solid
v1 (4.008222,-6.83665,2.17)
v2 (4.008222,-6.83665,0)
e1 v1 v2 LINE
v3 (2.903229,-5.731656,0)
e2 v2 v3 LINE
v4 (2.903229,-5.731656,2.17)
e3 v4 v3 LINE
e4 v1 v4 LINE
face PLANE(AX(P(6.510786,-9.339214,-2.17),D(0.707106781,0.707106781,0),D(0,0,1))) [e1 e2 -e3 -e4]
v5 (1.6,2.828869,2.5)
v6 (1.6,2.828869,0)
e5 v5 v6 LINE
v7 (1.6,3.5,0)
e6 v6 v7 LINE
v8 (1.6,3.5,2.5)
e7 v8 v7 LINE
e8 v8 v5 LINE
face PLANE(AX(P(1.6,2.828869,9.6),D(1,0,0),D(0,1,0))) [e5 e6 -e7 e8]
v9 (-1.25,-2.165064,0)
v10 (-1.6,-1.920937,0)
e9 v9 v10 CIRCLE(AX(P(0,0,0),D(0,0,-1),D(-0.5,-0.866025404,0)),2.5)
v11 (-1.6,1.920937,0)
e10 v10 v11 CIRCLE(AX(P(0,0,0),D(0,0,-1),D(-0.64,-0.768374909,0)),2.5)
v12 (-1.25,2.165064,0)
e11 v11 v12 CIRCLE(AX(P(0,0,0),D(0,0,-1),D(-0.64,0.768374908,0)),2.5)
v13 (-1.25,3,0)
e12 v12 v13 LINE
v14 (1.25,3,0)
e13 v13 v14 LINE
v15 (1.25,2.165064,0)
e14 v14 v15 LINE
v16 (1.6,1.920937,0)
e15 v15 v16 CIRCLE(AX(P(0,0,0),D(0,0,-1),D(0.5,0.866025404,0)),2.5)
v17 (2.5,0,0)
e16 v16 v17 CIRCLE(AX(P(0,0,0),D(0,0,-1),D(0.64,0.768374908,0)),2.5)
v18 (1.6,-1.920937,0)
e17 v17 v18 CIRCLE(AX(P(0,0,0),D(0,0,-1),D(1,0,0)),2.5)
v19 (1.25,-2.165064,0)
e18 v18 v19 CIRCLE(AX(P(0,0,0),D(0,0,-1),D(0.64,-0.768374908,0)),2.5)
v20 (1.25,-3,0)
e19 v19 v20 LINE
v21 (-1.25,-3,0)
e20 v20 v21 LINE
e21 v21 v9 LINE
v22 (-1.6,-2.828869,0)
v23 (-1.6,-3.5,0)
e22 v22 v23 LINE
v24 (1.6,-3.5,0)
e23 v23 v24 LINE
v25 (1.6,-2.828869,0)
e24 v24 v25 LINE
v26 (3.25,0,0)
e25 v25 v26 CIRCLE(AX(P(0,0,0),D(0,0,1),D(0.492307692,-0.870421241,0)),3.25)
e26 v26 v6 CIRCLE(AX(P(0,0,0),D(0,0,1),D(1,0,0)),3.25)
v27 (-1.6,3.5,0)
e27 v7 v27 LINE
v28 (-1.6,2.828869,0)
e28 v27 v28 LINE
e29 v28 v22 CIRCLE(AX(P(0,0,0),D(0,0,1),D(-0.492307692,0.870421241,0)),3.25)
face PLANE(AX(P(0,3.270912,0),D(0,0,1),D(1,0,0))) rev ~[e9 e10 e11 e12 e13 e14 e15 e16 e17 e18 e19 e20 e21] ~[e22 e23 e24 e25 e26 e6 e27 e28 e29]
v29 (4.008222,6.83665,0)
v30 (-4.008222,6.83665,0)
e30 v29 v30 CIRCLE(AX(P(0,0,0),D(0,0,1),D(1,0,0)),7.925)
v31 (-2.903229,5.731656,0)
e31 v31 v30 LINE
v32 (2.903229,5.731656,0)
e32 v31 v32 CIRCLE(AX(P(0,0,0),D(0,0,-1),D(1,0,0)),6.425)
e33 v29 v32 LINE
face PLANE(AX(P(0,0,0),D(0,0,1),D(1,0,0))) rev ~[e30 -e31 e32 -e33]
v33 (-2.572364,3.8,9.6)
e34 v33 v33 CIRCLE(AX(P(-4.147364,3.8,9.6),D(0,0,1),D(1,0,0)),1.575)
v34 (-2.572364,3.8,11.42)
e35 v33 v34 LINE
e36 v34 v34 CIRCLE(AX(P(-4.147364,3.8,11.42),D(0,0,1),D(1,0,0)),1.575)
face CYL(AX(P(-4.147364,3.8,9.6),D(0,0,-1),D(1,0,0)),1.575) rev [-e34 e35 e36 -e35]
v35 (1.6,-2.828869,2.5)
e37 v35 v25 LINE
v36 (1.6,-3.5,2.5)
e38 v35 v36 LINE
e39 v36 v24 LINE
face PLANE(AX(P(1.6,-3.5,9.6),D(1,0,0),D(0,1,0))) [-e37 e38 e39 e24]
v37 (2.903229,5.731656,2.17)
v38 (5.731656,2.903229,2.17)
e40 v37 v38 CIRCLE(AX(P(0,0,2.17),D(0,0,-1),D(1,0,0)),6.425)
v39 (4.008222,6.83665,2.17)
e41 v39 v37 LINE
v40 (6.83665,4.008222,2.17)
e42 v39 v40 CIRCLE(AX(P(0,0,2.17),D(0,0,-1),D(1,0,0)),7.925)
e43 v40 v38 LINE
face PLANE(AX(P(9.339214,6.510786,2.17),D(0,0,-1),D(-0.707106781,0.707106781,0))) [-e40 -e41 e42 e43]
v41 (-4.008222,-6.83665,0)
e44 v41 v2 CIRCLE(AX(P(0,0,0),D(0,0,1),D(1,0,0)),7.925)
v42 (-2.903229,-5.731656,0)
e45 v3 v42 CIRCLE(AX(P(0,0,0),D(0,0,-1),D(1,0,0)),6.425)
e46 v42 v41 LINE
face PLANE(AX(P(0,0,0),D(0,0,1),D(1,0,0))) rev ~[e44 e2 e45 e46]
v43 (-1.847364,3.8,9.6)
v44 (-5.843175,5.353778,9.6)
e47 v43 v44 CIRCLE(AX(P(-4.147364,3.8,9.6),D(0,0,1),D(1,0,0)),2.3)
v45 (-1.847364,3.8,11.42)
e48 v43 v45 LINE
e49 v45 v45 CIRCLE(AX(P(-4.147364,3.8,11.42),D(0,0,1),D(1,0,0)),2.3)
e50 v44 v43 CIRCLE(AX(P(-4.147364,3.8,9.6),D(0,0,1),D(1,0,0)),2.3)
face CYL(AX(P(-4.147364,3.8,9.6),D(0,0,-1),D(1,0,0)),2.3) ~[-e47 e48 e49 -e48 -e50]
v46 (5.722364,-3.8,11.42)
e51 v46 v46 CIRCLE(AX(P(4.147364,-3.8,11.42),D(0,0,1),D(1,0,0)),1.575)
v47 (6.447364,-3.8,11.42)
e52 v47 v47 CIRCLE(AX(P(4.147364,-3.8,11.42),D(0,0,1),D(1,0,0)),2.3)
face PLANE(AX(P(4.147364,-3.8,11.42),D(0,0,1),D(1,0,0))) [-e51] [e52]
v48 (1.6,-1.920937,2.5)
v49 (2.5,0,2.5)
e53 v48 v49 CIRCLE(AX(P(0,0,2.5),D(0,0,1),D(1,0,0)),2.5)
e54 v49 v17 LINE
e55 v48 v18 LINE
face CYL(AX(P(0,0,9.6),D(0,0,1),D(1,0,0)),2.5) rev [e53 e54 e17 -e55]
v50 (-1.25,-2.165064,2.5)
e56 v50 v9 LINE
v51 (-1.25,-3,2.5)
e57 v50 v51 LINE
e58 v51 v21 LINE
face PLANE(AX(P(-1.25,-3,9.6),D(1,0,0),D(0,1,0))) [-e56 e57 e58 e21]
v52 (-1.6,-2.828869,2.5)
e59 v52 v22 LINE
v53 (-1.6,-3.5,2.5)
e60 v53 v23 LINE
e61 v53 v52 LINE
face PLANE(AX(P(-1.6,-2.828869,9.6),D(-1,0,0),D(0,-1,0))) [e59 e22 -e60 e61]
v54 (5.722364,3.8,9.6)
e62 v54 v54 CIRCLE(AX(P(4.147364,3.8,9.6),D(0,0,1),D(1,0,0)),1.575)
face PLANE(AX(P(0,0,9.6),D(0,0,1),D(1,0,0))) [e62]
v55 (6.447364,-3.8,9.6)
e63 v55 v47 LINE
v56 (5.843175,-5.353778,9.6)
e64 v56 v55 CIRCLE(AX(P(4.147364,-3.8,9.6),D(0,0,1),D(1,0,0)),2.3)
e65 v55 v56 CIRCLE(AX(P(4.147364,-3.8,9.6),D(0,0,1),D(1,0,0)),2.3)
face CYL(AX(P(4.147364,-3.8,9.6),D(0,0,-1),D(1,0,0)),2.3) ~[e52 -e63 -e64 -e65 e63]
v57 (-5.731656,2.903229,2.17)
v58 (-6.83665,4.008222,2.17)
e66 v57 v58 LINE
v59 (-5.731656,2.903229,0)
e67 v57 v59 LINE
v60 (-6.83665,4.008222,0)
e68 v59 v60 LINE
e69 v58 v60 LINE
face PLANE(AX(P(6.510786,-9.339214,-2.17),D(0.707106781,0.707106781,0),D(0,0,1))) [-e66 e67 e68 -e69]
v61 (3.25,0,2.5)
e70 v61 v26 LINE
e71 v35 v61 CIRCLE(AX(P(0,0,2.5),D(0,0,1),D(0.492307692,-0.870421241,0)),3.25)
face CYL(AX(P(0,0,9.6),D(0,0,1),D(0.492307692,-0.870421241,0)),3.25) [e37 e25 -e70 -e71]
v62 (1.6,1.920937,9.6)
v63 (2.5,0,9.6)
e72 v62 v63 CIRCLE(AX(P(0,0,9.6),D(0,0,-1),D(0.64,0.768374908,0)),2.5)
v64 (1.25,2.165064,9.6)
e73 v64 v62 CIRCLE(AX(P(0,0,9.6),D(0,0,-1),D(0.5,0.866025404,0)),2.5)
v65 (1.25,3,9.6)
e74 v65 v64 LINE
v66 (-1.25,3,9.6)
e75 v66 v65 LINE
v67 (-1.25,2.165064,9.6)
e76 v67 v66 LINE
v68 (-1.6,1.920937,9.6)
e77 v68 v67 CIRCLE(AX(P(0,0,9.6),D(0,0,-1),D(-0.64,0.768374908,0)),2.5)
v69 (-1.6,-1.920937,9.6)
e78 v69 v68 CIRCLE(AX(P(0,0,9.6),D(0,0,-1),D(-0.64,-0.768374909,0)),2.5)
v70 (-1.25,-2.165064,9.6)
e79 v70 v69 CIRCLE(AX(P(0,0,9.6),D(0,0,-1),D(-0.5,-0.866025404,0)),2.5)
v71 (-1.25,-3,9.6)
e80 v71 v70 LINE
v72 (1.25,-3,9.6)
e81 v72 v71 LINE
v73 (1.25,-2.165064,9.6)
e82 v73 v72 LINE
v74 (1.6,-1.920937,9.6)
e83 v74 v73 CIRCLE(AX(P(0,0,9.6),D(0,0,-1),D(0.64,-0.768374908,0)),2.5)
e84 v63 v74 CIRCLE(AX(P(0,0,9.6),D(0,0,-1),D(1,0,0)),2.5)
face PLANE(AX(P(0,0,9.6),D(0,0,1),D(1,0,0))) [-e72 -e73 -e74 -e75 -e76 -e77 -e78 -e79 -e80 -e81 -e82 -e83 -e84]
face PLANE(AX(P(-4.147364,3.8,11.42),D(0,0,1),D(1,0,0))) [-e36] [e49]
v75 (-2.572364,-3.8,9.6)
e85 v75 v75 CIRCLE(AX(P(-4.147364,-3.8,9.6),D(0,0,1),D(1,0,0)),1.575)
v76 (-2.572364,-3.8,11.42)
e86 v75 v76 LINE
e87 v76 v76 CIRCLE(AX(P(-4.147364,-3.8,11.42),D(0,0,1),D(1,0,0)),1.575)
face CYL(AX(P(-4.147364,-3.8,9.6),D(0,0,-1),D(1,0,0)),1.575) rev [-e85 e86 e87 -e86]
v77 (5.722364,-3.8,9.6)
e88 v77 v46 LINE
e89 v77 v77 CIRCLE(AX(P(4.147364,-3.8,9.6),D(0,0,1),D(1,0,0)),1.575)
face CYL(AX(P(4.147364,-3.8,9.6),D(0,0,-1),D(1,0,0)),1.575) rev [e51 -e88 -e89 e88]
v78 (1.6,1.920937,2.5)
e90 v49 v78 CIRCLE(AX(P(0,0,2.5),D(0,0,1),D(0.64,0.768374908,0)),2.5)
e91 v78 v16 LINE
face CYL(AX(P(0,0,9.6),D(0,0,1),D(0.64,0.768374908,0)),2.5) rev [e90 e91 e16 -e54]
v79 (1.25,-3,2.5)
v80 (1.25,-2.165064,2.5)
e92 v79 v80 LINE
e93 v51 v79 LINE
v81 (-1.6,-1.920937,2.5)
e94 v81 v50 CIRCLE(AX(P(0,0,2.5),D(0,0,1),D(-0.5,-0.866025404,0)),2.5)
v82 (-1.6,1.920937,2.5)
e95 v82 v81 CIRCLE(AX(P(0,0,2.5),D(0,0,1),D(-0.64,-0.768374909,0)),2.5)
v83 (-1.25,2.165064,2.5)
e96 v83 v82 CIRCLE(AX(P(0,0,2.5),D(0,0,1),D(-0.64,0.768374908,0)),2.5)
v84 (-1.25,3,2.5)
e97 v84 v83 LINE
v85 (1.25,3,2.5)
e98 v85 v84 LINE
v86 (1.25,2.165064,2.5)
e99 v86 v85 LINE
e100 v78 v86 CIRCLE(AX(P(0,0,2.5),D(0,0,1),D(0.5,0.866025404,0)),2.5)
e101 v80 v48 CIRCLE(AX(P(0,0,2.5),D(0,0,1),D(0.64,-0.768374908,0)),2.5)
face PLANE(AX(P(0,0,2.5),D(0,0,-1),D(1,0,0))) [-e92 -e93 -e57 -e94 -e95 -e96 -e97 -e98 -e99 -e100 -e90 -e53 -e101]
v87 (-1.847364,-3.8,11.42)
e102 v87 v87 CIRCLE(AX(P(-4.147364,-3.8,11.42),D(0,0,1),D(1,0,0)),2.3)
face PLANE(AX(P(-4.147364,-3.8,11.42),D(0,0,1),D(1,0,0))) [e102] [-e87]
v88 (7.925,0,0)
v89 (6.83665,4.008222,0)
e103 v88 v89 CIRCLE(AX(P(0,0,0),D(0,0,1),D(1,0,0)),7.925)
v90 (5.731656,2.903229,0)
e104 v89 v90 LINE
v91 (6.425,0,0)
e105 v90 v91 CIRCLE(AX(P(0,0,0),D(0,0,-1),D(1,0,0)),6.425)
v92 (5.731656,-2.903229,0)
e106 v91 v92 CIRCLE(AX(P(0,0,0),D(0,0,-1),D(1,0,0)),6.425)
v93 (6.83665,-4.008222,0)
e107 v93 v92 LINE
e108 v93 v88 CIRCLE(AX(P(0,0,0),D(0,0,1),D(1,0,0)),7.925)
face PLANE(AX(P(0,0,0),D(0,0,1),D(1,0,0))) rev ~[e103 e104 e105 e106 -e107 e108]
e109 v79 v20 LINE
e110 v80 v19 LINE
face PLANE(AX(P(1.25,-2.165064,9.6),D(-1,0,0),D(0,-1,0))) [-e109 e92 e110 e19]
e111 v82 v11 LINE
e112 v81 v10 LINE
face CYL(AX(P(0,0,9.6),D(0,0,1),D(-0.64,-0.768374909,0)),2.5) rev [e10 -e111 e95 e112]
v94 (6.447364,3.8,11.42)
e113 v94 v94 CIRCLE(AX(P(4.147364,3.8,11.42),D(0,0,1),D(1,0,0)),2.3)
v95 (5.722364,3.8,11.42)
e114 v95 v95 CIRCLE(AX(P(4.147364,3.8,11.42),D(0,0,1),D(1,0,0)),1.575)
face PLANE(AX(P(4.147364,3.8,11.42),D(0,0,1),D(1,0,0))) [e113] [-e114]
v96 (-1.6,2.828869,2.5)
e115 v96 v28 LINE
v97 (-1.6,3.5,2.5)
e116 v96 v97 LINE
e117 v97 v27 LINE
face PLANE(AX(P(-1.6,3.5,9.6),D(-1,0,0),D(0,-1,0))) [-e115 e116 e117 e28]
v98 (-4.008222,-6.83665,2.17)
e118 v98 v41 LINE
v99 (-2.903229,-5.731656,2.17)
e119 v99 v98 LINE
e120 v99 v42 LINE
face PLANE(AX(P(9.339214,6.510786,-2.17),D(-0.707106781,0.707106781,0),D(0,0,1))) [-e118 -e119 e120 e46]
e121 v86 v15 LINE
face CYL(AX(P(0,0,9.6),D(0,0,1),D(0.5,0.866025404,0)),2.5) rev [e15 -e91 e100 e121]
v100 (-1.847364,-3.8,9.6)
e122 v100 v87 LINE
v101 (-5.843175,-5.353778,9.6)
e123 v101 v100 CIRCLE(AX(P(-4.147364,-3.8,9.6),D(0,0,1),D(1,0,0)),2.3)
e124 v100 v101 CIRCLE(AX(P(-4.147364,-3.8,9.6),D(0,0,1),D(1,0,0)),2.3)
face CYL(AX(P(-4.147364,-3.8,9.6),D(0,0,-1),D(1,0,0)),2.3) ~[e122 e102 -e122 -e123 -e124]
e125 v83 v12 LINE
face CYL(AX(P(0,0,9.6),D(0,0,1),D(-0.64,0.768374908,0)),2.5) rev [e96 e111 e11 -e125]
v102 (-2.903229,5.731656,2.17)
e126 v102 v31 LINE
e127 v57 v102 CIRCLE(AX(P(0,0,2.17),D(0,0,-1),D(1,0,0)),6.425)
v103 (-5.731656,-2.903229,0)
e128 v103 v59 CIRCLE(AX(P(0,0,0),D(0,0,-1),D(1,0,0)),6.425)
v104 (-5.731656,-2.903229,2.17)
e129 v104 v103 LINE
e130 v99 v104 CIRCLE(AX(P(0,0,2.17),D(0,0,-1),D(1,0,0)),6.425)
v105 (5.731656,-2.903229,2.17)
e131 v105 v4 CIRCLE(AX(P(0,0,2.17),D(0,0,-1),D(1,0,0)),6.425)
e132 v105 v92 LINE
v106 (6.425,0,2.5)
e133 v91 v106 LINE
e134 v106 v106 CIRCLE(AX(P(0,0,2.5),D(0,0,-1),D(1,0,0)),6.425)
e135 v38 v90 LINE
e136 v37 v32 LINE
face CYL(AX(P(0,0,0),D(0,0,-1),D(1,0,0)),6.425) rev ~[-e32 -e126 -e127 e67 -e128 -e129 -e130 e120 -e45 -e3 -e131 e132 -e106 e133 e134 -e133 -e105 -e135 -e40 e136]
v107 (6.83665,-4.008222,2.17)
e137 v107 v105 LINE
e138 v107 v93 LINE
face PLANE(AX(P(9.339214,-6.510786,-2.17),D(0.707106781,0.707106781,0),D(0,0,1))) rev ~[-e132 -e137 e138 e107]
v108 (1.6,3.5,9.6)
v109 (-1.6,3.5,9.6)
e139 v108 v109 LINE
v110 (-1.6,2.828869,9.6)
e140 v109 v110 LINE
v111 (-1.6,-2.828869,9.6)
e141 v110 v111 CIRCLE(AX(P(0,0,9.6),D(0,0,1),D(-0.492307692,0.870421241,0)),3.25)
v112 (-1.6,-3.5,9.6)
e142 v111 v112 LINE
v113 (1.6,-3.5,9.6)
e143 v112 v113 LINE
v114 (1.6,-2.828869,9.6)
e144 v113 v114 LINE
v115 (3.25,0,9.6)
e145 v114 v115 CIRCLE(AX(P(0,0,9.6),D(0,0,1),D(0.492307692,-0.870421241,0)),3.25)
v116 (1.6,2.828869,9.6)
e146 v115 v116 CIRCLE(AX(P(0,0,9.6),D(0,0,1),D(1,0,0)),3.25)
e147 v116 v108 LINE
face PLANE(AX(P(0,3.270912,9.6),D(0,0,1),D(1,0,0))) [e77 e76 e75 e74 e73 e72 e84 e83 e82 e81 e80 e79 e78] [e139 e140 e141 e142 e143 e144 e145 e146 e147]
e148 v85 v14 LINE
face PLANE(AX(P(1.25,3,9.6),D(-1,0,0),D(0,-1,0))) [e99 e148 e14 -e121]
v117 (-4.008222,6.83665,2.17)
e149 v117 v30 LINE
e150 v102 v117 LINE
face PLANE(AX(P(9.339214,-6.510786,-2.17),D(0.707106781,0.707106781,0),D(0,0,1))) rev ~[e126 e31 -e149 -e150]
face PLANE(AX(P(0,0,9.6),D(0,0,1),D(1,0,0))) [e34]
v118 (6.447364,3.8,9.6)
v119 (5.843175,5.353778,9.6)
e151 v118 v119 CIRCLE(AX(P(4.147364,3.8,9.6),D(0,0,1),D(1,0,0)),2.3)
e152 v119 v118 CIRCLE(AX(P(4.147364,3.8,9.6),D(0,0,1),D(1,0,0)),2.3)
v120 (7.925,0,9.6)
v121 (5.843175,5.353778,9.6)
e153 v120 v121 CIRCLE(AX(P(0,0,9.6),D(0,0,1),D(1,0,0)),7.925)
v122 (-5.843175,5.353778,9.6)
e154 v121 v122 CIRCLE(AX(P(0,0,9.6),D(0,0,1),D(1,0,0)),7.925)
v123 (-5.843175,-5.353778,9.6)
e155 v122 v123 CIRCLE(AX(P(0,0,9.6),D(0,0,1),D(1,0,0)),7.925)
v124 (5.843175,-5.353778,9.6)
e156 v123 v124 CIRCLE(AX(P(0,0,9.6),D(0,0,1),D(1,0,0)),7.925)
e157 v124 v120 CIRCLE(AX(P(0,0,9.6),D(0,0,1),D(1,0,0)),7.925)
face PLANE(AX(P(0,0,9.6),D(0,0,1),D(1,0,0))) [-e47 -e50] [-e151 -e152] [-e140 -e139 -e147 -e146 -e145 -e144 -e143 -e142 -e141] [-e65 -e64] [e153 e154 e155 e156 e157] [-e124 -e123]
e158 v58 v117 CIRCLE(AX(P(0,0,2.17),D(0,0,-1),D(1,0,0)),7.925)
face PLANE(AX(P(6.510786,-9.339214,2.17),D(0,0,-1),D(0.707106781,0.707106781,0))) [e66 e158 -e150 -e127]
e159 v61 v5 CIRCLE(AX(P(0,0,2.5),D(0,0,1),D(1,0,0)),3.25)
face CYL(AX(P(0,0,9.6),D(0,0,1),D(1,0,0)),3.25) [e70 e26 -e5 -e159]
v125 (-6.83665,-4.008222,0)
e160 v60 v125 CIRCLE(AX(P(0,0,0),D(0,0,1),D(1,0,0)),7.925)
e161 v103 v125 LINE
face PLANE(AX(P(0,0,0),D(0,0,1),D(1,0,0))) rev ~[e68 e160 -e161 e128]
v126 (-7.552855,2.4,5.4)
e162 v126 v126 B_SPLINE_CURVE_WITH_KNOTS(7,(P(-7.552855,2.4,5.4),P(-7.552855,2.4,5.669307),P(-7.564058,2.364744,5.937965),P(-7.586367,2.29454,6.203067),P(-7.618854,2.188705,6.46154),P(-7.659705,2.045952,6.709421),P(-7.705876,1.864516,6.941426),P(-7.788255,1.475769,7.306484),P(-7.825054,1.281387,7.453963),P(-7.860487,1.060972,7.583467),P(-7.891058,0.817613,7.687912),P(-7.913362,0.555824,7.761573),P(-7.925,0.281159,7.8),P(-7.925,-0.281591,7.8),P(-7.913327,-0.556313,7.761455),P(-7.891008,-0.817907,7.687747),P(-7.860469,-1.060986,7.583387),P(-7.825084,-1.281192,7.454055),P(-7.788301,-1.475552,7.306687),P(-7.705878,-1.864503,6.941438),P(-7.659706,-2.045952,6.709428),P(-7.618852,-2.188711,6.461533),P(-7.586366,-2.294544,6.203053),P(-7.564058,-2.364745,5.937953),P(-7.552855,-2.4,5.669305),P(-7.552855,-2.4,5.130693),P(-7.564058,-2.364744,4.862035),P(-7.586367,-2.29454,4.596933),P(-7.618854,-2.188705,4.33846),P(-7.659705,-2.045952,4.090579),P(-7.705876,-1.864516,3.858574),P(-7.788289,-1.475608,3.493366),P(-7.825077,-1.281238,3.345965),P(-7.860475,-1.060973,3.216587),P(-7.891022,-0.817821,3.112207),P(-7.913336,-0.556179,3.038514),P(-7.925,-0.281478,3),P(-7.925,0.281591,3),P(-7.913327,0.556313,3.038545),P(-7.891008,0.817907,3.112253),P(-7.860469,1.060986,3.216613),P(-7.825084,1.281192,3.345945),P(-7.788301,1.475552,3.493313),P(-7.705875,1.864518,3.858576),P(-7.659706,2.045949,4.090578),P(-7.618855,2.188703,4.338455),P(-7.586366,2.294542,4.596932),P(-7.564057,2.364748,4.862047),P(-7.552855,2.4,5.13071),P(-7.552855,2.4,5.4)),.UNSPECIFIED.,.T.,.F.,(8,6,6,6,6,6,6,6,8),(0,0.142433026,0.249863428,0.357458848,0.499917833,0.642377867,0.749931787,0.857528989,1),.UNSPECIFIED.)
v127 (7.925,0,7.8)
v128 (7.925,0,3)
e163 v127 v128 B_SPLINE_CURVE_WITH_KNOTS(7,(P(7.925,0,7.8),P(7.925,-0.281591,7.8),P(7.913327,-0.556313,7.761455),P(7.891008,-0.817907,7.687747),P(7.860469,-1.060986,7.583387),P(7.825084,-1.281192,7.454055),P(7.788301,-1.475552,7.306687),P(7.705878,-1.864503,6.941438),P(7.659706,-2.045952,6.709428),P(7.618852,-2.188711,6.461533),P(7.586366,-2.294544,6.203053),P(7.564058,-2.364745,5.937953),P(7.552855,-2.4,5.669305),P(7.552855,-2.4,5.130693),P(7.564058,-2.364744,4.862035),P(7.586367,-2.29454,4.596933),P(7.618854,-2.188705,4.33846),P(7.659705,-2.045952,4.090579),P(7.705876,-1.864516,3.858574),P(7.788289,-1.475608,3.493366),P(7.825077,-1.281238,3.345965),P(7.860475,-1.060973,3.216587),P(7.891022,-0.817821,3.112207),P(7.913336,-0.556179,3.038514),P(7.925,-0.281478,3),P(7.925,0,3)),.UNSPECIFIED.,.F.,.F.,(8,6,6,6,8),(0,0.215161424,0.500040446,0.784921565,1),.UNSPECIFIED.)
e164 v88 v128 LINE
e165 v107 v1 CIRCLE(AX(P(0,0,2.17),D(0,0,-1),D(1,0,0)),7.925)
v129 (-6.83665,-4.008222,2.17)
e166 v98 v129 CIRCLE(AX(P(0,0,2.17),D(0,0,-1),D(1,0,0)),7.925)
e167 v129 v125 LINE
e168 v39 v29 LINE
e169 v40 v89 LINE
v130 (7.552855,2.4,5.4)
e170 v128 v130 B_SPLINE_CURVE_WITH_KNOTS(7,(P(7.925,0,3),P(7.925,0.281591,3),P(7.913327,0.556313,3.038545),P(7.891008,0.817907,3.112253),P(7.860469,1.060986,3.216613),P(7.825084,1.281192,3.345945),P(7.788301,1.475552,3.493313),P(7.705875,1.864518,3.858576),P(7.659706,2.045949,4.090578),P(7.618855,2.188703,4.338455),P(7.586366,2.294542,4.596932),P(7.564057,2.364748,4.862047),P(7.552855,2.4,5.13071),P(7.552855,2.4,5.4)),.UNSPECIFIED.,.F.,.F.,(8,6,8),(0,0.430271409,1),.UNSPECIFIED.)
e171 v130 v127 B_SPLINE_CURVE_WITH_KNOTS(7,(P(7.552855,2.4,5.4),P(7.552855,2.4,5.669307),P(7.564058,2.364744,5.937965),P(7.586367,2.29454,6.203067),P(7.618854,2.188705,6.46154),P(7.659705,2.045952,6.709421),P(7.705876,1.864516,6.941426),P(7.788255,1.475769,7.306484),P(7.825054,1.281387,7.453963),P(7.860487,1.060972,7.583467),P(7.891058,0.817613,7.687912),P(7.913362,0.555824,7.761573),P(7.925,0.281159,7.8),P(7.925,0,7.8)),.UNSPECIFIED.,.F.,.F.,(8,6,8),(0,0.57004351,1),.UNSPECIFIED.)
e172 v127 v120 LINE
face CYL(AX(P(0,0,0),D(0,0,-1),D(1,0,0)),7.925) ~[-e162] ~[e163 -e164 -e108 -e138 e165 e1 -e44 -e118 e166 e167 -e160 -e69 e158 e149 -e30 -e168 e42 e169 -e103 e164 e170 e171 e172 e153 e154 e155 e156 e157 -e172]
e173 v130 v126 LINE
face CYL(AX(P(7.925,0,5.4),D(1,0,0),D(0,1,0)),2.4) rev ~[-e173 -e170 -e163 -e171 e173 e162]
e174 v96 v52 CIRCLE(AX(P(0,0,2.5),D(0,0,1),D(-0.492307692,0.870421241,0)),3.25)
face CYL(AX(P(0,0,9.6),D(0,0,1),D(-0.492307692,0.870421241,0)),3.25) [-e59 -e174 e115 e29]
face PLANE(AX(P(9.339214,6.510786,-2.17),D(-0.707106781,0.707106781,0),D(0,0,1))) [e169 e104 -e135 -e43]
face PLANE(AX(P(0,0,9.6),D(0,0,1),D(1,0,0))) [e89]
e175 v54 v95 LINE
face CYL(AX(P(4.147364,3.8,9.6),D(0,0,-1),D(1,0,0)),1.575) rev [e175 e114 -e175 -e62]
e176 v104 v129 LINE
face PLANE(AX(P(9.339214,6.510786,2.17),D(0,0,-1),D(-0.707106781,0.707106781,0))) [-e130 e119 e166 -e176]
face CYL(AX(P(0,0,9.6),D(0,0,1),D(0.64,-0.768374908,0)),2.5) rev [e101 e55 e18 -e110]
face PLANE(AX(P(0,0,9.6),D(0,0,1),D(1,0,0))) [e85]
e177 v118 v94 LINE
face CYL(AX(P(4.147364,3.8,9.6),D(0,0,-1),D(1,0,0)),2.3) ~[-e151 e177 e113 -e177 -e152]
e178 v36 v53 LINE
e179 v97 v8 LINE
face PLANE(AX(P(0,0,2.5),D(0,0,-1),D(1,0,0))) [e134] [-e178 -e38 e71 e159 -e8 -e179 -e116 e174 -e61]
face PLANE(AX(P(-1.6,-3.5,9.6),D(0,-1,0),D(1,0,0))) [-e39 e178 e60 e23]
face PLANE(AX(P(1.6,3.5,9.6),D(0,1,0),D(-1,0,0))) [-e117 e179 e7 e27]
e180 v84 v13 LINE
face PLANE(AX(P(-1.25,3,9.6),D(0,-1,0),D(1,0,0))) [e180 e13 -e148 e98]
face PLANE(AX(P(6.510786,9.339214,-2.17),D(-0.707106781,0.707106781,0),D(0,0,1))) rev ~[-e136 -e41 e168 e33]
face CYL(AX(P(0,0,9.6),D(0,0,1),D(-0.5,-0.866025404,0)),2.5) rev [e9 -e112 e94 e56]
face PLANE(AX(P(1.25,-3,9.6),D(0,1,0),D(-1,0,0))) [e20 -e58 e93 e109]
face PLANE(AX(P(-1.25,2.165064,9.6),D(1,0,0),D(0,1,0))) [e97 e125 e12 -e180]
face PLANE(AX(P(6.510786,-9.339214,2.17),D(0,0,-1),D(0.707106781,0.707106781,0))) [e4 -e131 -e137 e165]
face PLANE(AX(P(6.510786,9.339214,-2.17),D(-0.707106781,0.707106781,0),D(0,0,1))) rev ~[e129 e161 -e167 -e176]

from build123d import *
from build123d import SkipClean  # not in build123d's __all__

# Parameters (mm, degrees)
F0_R      = 7.925
F1_DEPTH  = 9.6
F2_R      = 6.425
F3_DEPTH  = 2.5
F4_R      = 2.3
F4_R_2    = 1.575
F5_DEPTH  = 1.82
F12_W     = 4
F12_H     = 4.34
F13_DEPTH = 22.4162849636
F10_W     = 4
F10_H     = 4.34
F14_DEPTH = 22.4162849636
F17_DEPTH = 9.6
F15_R     = 2.4
F18_DEPTH = 15.851


with BuildPart() as f1:
    # F0 (on Top) → F1 (new body)
    with BuildSketch(Plane.XY):
        Circle(F0_R)
    extrude(amount=F1_DEPTH)

    # F2 (on face) → F3 (cut)
    with BuildSketch(Plane(origin=(0, 0, 0), x_dir=(1, 0, 0), z_dir=(0, 0, -1))):
        Circle(F2_R)
    extrude(amount=-F3_DEPTH, mode=Mode.SUBTRACT)

    # F4 (on face) → F5 (join)
    with BuildSketch(Plane.XY.offset(9.6)):
        with Locations((-4.1473636204, -3.8)):
            Circle(F4_R)
        with Locations((-4.1473636204, -3.8)):
            Circle(F4_R_2, mode=Mode.SUBTRACT)
        with Locations((-4.1473636204, 3.8)):
            Circle(F4_R)
        with Locations((-4.1473636204, 3.8)):
            Circle(F4_R_2, mode=Mode.SUBTRACT)
        with Locations((4.1473636204, 3.8)):
            Circle(F4_R)
        with Locations((4.1473636204, 3.8)):
            Circle(F4_R_2, mode=Mode.SUBTRACT)
        with Locations((4.1473636204, -3.8)):
            Circle(F4_R)
        with Locations((4.1473636204, -3.8)):
            Circle(F4_R_2, mode=Mode.SUBTRACT)
    extrude(amount=F5_DEPTH)

    # F12 (on face) → F13 (cut, through all)
    with BuildSketch(Plane(origin=(7.925, 7.925, 0), x_dir=(-0.7071067812, 0.7071067812, 0), z_dir=(0.7071067812, 0.7071067812, 0))):
        Rectangle(F12_W, F12_H)
    extrude(amount=-F13_DEPTH, mode=Mode.SUBTRACT)

    # F10 (on face) → F14 (cut, through all)
    with BuildSketch(Plane(origin=(7.925, -7.925, 0), x_dir=(0.7071067812, 0.7071067812, 0), z_dir=(0.7071067812, -0.7071067812, 0))):
        Rectangle(F10_W, F10_H)
    extrude(amount=-F14_DEPTH, mode=Mode.SUBTRACT)

    # F16 (on face) → F17 (join)
    with BuildSketch(Plane.XY.offset(9.6)):
        with BuildLine():
            Line((1.6, 2.828869032), (1.6, 3.5))
            Line((1.6, 3.5), (-1.6, 3.5))
            Line((-1.6, 3.5), (-1.6, 2.828869032))
            ThreePointArc((-1.6, 2.828869032), (-1.4275666191, 2.9196838096), (-1.25, 3))
            ThreePointArc((-1.25, 3), (0, 3.25), (1.25, 3))
            ThreePointArc((1.25, 3), (1.4275666191, 2.9196838096), (1.6, 2.828869032))
        make_face()
        with BuildLine():
            ThreePointArc((3.25, 0), (2.8073564077, 1.6374522894), (1.6, 2.828869032))
            Line((1.6, 2.828869032), (1.6, 1.9209372712))
            ThreePointArc((1.6, 1.9209372712), (2.2638462845, 1.0606601718), (2.5, 0))
            ThreePointArc((2.5, 0), (2.2638462845, -1.0606601718), (1.6, -1.9209372712))
            Line((1.6, -1.9209372712), (1.6, -2.828869032))
            ThreePointArc((1.6, -2.828869032), (2.8073564077, -1.6374522894), (3.25, 0))
        make_face()
        with BuildLine():
            Line((1.6, 1.9209372712), (1.6, 2.828869032))
            ThreePointArc((1.6, 2.828869032), (1.4275666191, 2.9196838096), (1.25, 3))
            Line((1.25, 3), (1.25, 2.1650635095))
            ThreePointArc((1.25, 2.1650635095), (1.4302183068, 2.0504817958), (1.6, 1.9209372712))
        make_face()
        with BuildLine():
            ThreePointArc((-1.25, 3), (-1.4275666191, 2.9196838096), (-1.6, 2.828869032))
            Line((-1.6, 2.828869032), (-1.6, 1.9209372712))
            ThreePointArc((-1.6, 1.9209372712), (-1.4302183068, 2.0504817958), (-1.25, 2.1650635095))
            Line((-1.25, 2.1650635095), (-1.25, 3))
        make_face()
        with BuildLine():
            Line((-1.6, 1.9209372712), (-1.6, 2.828869032))
            ThreePointArc((-1.6, 2.828869032), (-3.25, 0), (-1.6, -2.828869032))
            Line((-1.6, -2.828869032), (-1.6, -1.9209372712))
            ThreePointArc((-1.6, -1.9209372712), (-2.5, 0), (-1.6, 1.9209372712))
        make_face()
        with BuildLine():
            ThreePointArc((-1.25, -3), (-1.4275666191, -2.9196838096), (-1.6, -2.828869032))
            Line((-1.6, -2.828869032), (-1.6, -3.5))
            Line((-1.6, -3.5), (1.6, -3.5))
            Line((1.6, -3.5), (1.6, -2.828869032))
            ThreePointArc((1.6, -2.828869032), (1.4275666191, -2.9196838096), (1.25, -3))
            ThreePointArc((1.25, -3), (0, -3.25), (-1.25, -3))
        make_face()
        with BuildLine():
            Line((-1.6, -1.9209372712), (-1.6, -2.828869032))
            ThreePointArc((-1.6, -2.828869032), (-1.4275666191, -2.9196838096), (-1.25, -3))
            Line((-1.25, -3), (-1.25, -2.1650635095))
            ThreePointArc((-1.25, -2.1650635095), (-1.4302183068, -2.0504817958), (-1.6, -1.9209372712))
        make_face()
        with BuildLine():
            Line((1.6, -2.828869032), (1.6, -1.9209372712))
            ThreePointArc((1.6, -1.9209372712), (1.4302183068, -2.0504817958), (1.25, -2.1650635095))
            Line((1.25, -2.1650635095), (1.25, -3))
            ThreePointArc((1.25, -3), (1.4275666191, -2.9196838096), (1.6, -2.828869032))
        make_face()
        with BuildLine():
            Line((-1.25, 3), (1.25, 3))
            ThreePointArc((1.25, 3), (0, 3.25), (-1.25, 3))
        make_face()
        with BuildLine():
            Line((1.25, -3), (-1.25, -3))
            ThreePointArc((-1.25, -3), (0, -3.25), (1.25, -3))
        make_face()
    with SkipClean():  # cleaning this boolean's faces spoils the solid; the shape is the same uncleaned
        extrude(amount=-F17_DEPTH)

    # F15 (on offset) → F18 (cut, through all)
    with BuildSketch(Plane.YZ.offset(7.925)):
        with Locations((0, 5.4)):
            Circle(F15_R)
    with SkipClean():  # cleaning this boolean's faces spoils the solid; the shape is the same uncleaned
        extrude(amount=-F18_DEPTH, mode=Mode.SUBTRACT)


solid = f1.part
